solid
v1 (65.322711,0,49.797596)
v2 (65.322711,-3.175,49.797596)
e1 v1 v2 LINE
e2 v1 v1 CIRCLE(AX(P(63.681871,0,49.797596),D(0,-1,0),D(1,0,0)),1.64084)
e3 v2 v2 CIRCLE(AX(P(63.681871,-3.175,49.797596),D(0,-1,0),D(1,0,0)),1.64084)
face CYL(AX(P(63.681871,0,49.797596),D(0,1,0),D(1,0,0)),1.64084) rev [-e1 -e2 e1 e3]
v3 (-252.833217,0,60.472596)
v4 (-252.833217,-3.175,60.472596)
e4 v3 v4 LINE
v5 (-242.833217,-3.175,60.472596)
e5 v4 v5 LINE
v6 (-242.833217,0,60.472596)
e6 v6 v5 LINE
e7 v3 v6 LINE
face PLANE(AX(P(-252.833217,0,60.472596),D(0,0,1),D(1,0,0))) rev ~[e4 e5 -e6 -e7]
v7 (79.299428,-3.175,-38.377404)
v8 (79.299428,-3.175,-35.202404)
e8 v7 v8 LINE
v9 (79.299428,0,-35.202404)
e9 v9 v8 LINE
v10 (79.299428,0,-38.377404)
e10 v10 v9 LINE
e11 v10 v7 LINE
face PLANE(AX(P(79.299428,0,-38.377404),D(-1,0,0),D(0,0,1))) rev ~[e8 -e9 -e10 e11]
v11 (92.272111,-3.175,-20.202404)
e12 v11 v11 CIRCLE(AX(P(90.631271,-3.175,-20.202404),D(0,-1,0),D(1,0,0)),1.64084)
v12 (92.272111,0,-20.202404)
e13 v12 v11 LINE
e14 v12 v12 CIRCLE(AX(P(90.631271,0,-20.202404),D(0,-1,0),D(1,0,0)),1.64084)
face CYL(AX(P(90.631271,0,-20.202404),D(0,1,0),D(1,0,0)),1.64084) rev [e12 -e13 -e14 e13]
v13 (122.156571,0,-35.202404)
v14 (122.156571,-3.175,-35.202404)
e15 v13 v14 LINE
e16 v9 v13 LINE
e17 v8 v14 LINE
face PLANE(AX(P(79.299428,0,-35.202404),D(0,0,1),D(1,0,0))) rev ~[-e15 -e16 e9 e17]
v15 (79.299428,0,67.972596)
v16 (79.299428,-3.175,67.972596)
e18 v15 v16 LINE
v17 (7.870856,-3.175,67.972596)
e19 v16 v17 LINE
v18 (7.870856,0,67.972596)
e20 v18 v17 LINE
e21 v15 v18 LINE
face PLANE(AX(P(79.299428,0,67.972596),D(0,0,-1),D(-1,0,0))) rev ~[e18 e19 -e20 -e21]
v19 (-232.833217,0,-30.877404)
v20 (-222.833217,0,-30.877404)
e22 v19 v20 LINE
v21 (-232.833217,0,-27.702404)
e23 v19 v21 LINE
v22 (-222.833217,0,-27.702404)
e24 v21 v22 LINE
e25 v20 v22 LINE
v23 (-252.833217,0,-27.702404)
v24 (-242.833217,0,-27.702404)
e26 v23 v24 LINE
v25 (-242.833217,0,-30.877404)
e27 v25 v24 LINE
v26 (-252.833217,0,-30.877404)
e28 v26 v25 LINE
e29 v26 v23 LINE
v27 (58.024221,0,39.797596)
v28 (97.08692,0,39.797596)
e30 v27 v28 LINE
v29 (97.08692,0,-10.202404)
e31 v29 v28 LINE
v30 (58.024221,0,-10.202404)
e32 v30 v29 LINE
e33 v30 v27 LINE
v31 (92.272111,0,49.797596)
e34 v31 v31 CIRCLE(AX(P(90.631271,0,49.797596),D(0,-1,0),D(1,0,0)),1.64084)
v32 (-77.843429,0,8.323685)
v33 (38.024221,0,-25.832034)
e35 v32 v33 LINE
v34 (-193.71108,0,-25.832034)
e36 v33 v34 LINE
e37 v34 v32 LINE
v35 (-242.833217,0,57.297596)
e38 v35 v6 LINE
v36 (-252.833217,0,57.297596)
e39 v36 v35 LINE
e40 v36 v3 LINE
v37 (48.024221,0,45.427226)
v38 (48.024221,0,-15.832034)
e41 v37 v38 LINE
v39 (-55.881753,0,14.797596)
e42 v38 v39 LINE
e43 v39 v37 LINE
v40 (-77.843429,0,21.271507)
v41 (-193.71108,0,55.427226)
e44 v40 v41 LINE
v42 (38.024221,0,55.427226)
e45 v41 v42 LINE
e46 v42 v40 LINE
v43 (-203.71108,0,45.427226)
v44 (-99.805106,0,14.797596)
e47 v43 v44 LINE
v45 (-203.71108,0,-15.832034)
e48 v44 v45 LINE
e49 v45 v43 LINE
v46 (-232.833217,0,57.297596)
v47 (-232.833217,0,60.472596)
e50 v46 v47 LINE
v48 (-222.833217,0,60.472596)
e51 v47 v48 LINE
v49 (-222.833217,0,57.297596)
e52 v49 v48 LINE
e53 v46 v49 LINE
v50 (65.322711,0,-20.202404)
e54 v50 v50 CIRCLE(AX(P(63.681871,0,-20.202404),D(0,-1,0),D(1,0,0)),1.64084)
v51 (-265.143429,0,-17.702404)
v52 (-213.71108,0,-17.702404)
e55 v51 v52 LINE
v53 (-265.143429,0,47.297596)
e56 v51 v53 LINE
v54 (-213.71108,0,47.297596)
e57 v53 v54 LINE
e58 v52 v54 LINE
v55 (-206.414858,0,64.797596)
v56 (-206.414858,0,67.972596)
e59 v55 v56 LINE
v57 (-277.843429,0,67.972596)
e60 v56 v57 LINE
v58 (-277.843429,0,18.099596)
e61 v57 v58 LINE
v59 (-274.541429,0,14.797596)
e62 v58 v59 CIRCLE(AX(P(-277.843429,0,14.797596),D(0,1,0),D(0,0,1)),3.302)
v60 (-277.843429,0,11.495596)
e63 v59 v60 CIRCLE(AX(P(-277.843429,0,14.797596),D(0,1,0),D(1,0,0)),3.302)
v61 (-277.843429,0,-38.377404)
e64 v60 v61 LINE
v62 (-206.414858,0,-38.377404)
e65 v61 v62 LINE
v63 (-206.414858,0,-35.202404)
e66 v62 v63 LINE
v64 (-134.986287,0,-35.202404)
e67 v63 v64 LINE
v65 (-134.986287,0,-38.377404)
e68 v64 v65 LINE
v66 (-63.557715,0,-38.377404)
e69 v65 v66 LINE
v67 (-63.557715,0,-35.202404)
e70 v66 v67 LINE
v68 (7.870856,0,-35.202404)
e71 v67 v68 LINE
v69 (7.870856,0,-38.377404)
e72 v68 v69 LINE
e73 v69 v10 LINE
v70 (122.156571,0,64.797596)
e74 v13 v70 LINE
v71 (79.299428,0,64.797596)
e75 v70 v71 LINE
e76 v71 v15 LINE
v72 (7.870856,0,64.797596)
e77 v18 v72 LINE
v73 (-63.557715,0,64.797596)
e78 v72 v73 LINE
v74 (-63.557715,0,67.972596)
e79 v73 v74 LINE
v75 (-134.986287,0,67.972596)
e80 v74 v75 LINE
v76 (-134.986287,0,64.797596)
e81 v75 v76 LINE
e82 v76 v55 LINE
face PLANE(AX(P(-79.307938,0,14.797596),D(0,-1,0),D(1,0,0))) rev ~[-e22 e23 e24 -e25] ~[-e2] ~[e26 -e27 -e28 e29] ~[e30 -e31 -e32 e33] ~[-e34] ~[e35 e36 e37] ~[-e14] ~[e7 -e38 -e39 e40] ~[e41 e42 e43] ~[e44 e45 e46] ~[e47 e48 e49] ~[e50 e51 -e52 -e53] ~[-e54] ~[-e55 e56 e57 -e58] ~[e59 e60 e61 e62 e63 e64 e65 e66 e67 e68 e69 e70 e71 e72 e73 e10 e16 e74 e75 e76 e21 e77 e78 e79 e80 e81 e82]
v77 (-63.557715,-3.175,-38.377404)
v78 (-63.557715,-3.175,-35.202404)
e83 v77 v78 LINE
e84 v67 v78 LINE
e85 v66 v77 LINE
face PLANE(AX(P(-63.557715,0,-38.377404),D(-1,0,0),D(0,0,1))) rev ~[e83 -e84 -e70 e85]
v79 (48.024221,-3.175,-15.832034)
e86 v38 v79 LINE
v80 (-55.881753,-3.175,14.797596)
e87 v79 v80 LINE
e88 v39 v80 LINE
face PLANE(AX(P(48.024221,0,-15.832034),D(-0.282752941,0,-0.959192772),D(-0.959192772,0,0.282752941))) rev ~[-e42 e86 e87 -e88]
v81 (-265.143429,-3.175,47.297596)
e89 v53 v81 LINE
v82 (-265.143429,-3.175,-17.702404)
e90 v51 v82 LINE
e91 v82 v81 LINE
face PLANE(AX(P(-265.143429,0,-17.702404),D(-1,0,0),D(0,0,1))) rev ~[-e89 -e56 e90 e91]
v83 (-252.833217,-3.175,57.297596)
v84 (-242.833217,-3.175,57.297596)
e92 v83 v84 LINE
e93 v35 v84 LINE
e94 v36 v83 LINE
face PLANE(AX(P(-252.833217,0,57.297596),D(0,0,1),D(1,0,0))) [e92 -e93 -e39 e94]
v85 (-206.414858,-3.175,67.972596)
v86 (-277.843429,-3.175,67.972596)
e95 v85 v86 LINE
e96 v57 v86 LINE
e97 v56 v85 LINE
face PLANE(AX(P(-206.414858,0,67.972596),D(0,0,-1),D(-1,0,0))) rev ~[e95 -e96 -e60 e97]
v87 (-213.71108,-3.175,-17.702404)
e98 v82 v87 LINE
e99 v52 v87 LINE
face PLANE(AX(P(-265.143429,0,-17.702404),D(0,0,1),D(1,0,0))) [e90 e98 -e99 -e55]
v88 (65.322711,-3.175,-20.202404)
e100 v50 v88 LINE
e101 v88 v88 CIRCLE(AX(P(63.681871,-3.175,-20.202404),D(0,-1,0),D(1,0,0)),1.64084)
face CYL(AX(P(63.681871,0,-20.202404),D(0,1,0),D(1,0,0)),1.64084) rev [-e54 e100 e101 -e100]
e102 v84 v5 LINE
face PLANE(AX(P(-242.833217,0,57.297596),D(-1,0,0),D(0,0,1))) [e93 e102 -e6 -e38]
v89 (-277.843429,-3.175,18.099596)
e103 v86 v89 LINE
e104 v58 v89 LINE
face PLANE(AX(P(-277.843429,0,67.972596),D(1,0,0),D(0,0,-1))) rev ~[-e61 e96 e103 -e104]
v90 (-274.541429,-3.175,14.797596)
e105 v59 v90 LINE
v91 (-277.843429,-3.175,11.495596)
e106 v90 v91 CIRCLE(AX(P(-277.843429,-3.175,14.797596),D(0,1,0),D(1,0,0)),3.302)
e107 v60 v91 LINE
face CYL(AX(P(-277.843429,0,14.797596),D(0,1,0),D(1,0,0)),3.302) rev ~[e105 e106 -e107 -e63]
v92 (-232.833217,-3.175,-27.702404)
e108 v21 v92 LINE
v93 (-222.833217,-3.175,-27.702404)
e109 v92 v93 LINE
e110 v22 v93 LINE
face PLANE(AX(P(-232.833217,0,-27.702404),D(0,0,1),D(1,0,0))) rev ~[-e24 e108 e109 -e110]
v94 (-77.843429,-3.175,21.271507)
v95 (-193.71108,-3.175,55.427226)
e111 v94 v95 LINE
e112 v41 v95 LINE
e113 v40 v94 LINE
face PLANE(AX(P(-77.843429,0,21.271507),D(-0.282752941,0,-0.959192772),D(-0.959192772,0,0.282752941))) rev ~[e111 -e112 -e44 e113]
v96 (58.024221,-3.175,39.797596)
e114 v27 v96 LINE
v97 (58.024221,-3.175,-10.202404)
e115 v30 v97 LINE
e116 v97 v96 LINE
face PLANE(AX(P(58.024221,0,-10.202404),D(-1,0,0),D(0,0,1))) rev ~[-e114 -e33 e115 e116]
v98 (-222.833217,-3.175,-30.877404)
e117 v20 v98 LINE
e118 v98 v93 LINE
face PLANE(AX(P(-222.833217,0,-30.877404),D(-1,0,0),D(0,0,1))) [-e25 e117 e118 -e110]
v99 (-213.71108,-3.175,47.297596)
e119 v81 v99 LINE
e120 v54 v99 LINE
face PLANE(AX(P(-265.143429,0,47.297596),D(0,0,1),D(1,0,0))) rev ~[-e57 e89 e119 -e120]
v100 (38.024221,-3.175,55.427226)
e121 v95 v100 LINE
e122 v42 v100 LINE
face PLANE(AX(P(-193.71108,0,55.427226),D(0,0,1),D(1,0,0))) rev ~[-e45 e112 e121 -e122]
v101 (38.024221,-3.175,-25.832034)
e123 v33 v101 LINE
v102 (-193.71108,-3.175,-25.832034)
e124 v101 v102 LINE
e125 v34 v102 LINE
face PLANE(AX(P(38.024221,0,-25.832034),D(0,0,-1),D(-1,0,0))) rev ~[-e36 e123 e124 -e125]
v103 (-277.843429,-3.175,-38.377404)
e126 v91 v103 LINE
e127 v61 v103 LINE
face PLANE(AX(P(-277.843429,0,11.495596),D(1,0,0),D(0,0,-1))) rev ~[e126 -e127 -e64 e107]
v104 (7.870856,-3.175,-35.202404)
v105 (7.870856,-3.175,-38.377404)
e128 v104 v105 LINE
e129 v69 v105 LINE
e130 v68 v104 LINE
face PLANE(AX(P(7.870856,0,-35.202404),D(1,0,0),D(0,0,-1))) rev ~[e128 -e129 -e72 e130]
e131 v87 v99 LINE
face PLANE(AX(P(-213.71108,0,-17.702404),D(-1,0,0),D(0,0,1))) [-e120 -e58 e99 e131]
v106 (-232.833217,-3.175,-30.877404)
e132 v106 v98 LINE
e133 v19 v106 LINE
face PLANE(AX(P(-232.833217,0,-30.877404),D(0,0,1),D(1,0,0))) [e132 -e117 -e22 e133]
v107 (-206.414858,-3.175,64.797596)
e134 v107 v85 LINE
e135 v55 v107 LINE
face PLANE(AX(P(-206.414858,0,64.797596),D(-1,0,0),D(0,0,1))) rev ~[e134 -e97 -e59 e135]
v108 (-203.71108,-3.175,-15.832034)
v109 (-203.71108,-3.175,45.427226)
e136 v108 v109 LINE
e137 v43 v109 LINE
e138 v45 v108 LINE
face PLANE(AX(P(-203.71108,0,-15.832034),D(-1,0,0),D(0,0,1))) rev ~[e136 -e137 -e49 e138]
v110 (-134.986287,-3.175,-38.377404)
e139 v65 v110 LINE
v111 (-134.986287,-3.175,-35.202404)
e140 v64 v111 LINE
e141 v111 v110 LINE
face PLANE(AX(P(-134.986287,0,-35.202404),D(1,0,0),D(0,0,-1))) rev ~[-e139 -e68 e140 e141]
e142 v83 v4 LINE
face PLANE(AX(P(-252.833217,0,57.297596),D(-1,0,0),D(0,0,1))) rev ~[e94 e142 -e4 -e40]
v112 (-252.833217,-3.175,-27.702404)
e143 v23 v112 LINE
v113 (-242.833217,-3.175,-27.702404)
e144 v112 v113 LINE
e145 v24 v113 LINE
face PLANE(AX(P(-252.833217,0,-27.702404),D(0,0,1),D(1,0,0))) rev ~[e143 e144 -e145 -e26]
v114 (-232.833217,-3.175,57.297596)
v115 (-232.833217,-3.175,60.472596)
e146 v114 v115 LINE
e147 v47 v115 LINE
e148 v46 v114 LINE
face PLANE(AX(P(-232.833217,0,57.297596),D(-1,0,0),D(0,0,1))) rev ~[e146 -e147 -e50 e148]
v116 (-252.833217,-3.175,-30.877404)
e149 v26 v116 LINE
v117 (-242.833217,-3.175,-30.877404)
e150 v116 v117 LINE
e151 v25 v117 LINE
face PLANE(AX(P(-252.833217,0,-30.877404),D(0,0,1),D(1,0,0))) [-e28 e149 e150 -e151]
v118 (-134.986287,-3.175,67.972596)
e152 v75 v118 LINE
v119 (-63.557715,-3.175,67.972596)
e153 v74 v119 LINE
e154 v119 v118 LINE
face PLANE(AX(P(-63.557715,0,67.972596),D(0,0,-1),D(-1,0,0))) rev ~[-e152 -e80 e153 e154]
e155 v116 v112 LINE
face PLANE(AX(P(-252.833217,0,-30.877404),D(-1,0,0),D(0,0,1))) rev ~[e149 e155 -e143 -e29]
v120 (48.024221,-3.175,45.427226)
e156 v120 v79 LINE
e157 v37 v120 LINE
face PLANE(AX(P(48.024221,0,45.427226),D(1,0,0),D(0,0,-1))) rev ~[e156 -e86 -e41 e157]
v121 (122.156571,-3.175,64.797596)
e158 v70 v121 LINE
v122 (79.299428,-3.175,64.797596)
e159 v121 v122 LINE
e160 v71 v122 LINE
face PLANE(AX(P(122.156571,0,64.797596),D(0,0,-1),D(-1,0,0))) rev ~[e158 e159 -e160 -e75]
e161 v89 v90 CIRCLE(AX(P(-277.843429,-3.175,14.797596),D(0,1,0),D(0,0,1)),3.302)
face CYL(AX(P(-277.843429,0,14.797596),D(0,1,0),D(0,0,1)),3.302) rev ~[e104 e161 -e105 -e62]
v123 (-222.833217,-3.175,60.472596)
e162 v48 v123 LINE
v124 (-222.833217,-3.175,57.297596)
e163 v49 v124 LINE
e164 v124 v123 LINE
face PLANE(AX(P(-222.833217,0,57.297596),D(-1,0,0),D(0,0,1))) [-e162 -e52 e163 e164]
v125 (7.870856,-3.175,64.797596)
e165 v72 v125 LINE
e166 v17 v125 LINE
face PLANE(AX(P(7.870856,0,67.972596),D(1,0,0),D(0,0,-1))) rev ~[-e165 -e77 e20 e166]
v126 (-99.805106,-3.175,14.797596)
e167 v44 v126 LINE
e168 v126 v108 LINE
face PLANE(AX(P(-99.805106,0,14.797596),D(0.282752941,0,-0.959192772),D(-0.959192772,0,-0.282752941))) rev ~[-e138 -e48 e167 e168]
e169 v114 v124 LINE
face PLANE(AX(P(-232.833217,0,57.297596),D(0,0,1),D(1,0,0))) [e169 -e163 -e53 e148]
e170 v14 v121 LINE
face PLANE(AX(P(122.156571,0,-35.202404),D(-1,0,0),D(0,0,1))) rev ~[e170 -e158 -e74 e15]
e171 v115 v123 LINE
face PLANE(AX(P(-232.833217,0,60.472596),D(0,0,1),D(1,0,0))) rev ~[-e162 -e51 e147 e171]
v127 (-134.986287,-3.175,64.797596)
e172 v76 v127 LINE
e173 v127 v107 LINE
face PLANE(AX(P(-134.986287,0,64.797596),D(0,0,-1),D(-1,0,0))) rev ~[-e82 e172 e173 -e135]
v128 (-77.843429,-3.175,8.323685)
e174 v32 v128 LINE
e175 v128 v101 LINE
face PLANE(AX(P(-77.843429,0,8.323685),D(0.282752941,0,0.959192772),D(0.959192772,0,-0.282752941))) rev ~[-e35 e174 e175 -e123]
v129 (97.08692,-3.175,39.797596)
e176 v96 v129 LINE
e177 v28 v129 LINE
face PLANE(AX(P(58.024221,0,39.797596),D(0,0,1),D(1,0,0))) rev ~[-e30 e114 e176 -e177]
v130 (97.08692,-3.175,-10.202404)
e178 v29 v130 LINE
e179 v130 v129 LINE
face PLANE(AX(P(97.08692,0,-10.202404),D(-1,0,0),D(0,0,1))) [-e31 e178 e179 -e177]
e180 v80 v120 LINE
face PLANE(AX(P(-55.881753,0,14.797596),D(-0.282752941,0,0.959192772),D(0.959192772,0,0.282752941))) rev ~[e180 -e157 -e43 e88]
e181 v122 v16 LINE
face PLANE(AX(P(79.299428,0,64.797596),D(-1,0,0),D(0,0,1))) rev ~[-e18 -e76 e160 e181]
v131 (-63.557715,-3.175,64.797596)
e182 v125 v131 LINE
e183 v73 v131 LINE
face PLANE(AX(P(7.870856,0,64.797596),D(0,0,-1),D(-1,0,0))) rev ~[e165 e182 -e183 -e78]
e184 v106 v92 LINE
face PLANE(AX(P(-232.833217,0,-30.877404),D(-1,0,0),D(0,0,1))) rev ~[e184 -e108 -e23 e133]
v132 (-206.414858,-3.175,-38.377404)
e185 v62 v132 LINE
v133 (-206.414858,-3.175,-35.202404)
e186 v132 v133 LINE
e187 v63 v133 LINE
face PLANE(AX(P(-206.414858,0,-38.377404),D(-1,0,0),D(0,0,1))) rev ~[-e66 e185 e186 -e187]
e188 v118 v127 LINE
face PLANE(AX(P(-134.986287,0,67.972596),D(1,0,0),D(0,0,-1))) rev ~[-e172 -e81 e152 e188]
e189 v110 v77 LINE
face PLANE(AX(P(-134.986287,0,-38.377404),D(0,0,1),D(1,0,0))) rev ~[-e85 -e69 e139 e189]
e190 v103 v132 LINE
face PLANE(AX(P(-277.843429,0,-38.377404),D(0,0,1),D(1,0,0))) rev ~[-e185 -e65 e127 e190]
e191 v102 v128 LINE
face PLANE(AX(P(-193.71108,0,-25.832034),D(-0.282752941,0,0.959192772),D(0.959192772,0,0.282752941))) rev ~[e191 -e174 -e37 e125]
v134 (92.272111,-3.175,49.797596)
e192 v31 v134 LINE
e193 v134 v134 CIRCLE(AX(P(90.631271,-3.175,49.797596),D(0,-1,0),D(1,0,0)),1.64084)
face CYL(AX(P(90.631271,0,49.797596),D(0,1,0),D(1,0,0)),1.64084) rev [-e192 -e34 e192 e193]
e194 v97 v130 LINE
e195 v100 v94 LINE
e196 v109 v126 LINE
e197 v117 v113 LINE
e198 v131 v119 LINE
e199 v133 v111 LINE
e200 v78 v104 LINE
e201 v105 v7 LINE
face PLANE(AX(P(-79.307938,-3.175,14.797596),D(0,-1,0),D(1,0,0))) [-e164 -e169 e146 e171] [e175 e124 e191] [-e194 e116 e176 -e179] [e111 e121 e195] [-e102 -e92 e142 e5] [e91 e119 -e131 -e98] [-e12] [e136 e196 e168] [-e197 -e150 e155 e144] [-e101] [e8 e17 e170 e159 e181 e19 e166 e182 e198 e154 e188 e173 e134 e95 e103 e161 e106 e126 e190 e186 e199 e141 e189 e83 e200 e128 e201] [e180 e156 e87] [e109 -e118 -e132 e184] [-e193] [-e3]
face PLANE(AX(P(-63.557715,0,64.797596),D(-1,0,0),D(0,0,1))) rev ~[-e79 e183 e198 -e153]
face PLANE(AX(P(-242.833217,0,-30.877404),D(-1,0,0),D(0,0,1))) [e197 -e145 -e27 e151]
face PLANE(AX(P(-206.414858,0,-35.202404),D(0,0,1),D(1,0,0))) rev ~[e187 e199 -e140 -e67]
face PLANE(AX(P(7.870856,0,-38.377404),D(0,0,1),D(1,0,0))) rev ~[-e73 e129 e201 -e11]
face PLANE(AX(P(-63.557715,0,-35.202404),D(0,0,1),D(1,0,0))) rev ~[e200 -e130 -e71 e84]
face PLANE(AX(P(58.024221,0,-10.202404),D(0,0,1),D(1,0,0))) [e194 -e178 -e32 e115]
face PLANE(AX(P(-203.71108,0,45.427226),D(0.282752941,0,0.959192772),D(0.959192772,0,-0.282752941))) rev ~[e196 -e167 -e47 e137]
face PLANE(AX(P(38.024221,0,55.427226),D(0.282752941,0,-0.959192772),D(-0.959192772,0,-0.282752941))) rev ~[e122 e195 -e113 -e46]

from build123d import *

# Parameters (mm, degrees)
F0_W     = 10
F0_H     = 3.175
F0_W_2   = 51.432349664
F0_H_2   = 65
F0_R     = 1.64084
F0_W_3   = 39.0626990616
F0_H_3   = 50
F1_DEPTH = 3.175


# Not quite as in the source:
# - a feature names something its author has since deleted; it is built from what else it names


with BuildPart() as f1:
    # F0 (on Front) → F1 (new body)
    with BuildSketch(Plane.XZ):
        with BuildLine():
            Line((79.2994276966, -35.2024036679), (122.1565705538, -35.2024036679))
            Line((122.1565705538, -35.2024036679), (122.1565705538, 64.7975963321))
            Line((122.1565705538, 64.7975963321), (79.2994276966, 64.7975963321))
            Line((79.2994276966, 64.7975963321), (79.2994276966, 67.9725963321))
            Line((79.2994276966, 67.9725963321), (7.870856268, 67.9725963321))
            Line((7.870856268, 67.9725963321), (7.870856268, 64.7975963321))
            Line((7.870856268, 64.7975963321), (-63.5577151605, 64.7975963321))
            Line((-63.5577151605, 64.7975963321), (-63.5577151605, 67.9725963321))
            Line((-63.5577151605, 67.9725963321), (-134.9862865891, 67.9725963321))
            Line((-134.9862865891, 67.9725963321), (-134.9862865891, 64.7975963321))
            Line((-134.9862865891, 64.7975963321), (-206.4148580177, 64.7975963321))
            Line((-206.4148580177, 64.7975963321), (-206.4148580177, 67.9725963321))
            Line((-206.4148580177, 67.9725963321), (-277.8434294462, 67.9725963321))
            Line((-277.8434294462, 67.9725963321), (-277.8434294462, 64.7975963321))
            Line((-277.8434294462, 64.7975963321), (-277.8434294462, 18.0995963321))
            ThreePointArc((-277.8434294462, 18.0995963321), (-275.5085628548, 17.1324629236), (-274.5414294462, 14.7975963321))
            ThreePointArc((-274.5414294462, 14.7975963321), (-275.5085628548, 12.4627297406), (-277.8434294462, 11.4955963321))
            Line((-277.8434294462, 11.4955963321), (-277.8434294462, -35.2024036679))
            Line((-277.8434294462, -35.2024036679), (-277.8434294462, -38.3774036679))
            Line((-277.8434294462, -38.3774036679), (-206.4148580177, -38.3774036679))
            Line((-206.4148580177, -38.3774036679), (-206.4148580177, -35.2024036679))
            Line((-206.4148580177, -35.2024036679), (-134.9862865891, -35.2024036679))
            Line((-134.9862865891, -35.2024036679), (-134.9862865891, -38.3774036679))
            Line((-134.9862865891, -38.3774036679), (-63.5577151605, -38.3774036679))
            Line((-63.5577151605, -38.3774036679), (-63.5577151605, -35.2024036679))
            Line((-63.5577151605, -35.2024036679), (7.870856268, -35.2024036679))
            Line((7.870856268, -35.2024036679), (7.870856268, -38.3774036679))
            Line((7.870856268, -38.3774036679), (79.2994276966, -38.3774036679))
            Line((79.2994276966, -38.3774036679), (79.2994276966, -35.2024036679))
        make_face()
        with Locations((-247.8332173824, -29.2899036679)):
            Rectangle(F0_W, F0_H, mode=Mode.SUBTRACT)
        with Locations((-227.8332173824, -29.2899036679)):
            Rectangle(F0_W, F0_H, mode=Mode.SUBTRACT)
        with Locations((-239.4272546143, 14.7975963321)):
            Rectangle(F0_W_2, F0_H_2, mode=Mode.SUBTRACT)
        with Locations((63.6818705538, -20.2024036679)):
            Circle(F0_R, mode=Mode.SUBTRACT)
        with Locations((90.6312705538, -20.2024036679)):
            Circle(F0_R, mode=Mode.SUBTRACT)
        Polygon((48.0242208898, -15.8320336679), (48.0242208898, -25.8320336679), (38.0242208898, -25.8320336679), (-193.7110797823, -25.8320336679), (-203.7110797823, -25.8320336679), (-203.7110797823, -15.8320336679), (-203.7110797823, 45.4272263321), (-203.7110797823, 55.4272263321), (-193.7110797823, 55.4272263321), (38.0242208898, 55.4272263321), (48.0242208898, 55.4272263321), (48.0242208898, 45.4272263321), align=None, mode=Mode.SUBTRACT)
        with Locations((77.5555704206, 14.7975963321)):
            Rectangle(F0_W_3, F0_H_3, mode=Mode.SUBTRACT)
        with Locations((-247.8332173824, 58.8850963321)):
            Rectangle(F0_W, F0_H, mode=Mode.SUBTRACT)
        with Locations((-227.8332173824, 58.8850963321)):
            Rectangle(F0_W, F0_H, mode=Mode.SUBTRACT)
        with Locations((63.6818705538, 49.7975963321)):
            Circle(F0_R, mode=Mode.SUBTRACT)
        with Locations((90.6312705538, 49.7975963321)):
            Circle(F0_R, mode=Mode.SUBTRACT)
        Polygon((-203.7110797823, 45.4272263321), (-99.8051057724, 14.7975963321), (-77.8434294462, 21.2715072545), (-193.7110797823, 55.4272263321), (-203.7110797823, 55.4272263321), align=None)
        Polygon((-203.7110797823, -25.8320336679), (-193.7110797823, -25.8320336679), (-77.8434294462, 8.3236854097), (-99.8051057724, 14.7975963321), (-203.7110797823, -15.8320336679), align=None)
        Polygon((38.0242208898, -25.8320336679), (48.0242208898, -25.8320336679), (48.0242208898, -15.8320336679), (-55.8817531201, 14.7975963321), (-77.8434294462, 8.3236854097), align=None)
        Polygon((-55.8817531201, 14.7975963321), (48.0242208898, 45.4272263321), (48.0242208898, 55.4272263321), (38.0242208898, 55.4272263321), (-77.8434294462, 21.2715072545), align=None)
        Polygon((-99.8051057724, 14.7975963321), (-77.8434294462, 8.3236854097), (-55.8817531201, 14.7975963321), (-77.8434294462, 21.2715072545), align=None)
    extrude(amount=F1_DEPTH)


solid = f1.part
